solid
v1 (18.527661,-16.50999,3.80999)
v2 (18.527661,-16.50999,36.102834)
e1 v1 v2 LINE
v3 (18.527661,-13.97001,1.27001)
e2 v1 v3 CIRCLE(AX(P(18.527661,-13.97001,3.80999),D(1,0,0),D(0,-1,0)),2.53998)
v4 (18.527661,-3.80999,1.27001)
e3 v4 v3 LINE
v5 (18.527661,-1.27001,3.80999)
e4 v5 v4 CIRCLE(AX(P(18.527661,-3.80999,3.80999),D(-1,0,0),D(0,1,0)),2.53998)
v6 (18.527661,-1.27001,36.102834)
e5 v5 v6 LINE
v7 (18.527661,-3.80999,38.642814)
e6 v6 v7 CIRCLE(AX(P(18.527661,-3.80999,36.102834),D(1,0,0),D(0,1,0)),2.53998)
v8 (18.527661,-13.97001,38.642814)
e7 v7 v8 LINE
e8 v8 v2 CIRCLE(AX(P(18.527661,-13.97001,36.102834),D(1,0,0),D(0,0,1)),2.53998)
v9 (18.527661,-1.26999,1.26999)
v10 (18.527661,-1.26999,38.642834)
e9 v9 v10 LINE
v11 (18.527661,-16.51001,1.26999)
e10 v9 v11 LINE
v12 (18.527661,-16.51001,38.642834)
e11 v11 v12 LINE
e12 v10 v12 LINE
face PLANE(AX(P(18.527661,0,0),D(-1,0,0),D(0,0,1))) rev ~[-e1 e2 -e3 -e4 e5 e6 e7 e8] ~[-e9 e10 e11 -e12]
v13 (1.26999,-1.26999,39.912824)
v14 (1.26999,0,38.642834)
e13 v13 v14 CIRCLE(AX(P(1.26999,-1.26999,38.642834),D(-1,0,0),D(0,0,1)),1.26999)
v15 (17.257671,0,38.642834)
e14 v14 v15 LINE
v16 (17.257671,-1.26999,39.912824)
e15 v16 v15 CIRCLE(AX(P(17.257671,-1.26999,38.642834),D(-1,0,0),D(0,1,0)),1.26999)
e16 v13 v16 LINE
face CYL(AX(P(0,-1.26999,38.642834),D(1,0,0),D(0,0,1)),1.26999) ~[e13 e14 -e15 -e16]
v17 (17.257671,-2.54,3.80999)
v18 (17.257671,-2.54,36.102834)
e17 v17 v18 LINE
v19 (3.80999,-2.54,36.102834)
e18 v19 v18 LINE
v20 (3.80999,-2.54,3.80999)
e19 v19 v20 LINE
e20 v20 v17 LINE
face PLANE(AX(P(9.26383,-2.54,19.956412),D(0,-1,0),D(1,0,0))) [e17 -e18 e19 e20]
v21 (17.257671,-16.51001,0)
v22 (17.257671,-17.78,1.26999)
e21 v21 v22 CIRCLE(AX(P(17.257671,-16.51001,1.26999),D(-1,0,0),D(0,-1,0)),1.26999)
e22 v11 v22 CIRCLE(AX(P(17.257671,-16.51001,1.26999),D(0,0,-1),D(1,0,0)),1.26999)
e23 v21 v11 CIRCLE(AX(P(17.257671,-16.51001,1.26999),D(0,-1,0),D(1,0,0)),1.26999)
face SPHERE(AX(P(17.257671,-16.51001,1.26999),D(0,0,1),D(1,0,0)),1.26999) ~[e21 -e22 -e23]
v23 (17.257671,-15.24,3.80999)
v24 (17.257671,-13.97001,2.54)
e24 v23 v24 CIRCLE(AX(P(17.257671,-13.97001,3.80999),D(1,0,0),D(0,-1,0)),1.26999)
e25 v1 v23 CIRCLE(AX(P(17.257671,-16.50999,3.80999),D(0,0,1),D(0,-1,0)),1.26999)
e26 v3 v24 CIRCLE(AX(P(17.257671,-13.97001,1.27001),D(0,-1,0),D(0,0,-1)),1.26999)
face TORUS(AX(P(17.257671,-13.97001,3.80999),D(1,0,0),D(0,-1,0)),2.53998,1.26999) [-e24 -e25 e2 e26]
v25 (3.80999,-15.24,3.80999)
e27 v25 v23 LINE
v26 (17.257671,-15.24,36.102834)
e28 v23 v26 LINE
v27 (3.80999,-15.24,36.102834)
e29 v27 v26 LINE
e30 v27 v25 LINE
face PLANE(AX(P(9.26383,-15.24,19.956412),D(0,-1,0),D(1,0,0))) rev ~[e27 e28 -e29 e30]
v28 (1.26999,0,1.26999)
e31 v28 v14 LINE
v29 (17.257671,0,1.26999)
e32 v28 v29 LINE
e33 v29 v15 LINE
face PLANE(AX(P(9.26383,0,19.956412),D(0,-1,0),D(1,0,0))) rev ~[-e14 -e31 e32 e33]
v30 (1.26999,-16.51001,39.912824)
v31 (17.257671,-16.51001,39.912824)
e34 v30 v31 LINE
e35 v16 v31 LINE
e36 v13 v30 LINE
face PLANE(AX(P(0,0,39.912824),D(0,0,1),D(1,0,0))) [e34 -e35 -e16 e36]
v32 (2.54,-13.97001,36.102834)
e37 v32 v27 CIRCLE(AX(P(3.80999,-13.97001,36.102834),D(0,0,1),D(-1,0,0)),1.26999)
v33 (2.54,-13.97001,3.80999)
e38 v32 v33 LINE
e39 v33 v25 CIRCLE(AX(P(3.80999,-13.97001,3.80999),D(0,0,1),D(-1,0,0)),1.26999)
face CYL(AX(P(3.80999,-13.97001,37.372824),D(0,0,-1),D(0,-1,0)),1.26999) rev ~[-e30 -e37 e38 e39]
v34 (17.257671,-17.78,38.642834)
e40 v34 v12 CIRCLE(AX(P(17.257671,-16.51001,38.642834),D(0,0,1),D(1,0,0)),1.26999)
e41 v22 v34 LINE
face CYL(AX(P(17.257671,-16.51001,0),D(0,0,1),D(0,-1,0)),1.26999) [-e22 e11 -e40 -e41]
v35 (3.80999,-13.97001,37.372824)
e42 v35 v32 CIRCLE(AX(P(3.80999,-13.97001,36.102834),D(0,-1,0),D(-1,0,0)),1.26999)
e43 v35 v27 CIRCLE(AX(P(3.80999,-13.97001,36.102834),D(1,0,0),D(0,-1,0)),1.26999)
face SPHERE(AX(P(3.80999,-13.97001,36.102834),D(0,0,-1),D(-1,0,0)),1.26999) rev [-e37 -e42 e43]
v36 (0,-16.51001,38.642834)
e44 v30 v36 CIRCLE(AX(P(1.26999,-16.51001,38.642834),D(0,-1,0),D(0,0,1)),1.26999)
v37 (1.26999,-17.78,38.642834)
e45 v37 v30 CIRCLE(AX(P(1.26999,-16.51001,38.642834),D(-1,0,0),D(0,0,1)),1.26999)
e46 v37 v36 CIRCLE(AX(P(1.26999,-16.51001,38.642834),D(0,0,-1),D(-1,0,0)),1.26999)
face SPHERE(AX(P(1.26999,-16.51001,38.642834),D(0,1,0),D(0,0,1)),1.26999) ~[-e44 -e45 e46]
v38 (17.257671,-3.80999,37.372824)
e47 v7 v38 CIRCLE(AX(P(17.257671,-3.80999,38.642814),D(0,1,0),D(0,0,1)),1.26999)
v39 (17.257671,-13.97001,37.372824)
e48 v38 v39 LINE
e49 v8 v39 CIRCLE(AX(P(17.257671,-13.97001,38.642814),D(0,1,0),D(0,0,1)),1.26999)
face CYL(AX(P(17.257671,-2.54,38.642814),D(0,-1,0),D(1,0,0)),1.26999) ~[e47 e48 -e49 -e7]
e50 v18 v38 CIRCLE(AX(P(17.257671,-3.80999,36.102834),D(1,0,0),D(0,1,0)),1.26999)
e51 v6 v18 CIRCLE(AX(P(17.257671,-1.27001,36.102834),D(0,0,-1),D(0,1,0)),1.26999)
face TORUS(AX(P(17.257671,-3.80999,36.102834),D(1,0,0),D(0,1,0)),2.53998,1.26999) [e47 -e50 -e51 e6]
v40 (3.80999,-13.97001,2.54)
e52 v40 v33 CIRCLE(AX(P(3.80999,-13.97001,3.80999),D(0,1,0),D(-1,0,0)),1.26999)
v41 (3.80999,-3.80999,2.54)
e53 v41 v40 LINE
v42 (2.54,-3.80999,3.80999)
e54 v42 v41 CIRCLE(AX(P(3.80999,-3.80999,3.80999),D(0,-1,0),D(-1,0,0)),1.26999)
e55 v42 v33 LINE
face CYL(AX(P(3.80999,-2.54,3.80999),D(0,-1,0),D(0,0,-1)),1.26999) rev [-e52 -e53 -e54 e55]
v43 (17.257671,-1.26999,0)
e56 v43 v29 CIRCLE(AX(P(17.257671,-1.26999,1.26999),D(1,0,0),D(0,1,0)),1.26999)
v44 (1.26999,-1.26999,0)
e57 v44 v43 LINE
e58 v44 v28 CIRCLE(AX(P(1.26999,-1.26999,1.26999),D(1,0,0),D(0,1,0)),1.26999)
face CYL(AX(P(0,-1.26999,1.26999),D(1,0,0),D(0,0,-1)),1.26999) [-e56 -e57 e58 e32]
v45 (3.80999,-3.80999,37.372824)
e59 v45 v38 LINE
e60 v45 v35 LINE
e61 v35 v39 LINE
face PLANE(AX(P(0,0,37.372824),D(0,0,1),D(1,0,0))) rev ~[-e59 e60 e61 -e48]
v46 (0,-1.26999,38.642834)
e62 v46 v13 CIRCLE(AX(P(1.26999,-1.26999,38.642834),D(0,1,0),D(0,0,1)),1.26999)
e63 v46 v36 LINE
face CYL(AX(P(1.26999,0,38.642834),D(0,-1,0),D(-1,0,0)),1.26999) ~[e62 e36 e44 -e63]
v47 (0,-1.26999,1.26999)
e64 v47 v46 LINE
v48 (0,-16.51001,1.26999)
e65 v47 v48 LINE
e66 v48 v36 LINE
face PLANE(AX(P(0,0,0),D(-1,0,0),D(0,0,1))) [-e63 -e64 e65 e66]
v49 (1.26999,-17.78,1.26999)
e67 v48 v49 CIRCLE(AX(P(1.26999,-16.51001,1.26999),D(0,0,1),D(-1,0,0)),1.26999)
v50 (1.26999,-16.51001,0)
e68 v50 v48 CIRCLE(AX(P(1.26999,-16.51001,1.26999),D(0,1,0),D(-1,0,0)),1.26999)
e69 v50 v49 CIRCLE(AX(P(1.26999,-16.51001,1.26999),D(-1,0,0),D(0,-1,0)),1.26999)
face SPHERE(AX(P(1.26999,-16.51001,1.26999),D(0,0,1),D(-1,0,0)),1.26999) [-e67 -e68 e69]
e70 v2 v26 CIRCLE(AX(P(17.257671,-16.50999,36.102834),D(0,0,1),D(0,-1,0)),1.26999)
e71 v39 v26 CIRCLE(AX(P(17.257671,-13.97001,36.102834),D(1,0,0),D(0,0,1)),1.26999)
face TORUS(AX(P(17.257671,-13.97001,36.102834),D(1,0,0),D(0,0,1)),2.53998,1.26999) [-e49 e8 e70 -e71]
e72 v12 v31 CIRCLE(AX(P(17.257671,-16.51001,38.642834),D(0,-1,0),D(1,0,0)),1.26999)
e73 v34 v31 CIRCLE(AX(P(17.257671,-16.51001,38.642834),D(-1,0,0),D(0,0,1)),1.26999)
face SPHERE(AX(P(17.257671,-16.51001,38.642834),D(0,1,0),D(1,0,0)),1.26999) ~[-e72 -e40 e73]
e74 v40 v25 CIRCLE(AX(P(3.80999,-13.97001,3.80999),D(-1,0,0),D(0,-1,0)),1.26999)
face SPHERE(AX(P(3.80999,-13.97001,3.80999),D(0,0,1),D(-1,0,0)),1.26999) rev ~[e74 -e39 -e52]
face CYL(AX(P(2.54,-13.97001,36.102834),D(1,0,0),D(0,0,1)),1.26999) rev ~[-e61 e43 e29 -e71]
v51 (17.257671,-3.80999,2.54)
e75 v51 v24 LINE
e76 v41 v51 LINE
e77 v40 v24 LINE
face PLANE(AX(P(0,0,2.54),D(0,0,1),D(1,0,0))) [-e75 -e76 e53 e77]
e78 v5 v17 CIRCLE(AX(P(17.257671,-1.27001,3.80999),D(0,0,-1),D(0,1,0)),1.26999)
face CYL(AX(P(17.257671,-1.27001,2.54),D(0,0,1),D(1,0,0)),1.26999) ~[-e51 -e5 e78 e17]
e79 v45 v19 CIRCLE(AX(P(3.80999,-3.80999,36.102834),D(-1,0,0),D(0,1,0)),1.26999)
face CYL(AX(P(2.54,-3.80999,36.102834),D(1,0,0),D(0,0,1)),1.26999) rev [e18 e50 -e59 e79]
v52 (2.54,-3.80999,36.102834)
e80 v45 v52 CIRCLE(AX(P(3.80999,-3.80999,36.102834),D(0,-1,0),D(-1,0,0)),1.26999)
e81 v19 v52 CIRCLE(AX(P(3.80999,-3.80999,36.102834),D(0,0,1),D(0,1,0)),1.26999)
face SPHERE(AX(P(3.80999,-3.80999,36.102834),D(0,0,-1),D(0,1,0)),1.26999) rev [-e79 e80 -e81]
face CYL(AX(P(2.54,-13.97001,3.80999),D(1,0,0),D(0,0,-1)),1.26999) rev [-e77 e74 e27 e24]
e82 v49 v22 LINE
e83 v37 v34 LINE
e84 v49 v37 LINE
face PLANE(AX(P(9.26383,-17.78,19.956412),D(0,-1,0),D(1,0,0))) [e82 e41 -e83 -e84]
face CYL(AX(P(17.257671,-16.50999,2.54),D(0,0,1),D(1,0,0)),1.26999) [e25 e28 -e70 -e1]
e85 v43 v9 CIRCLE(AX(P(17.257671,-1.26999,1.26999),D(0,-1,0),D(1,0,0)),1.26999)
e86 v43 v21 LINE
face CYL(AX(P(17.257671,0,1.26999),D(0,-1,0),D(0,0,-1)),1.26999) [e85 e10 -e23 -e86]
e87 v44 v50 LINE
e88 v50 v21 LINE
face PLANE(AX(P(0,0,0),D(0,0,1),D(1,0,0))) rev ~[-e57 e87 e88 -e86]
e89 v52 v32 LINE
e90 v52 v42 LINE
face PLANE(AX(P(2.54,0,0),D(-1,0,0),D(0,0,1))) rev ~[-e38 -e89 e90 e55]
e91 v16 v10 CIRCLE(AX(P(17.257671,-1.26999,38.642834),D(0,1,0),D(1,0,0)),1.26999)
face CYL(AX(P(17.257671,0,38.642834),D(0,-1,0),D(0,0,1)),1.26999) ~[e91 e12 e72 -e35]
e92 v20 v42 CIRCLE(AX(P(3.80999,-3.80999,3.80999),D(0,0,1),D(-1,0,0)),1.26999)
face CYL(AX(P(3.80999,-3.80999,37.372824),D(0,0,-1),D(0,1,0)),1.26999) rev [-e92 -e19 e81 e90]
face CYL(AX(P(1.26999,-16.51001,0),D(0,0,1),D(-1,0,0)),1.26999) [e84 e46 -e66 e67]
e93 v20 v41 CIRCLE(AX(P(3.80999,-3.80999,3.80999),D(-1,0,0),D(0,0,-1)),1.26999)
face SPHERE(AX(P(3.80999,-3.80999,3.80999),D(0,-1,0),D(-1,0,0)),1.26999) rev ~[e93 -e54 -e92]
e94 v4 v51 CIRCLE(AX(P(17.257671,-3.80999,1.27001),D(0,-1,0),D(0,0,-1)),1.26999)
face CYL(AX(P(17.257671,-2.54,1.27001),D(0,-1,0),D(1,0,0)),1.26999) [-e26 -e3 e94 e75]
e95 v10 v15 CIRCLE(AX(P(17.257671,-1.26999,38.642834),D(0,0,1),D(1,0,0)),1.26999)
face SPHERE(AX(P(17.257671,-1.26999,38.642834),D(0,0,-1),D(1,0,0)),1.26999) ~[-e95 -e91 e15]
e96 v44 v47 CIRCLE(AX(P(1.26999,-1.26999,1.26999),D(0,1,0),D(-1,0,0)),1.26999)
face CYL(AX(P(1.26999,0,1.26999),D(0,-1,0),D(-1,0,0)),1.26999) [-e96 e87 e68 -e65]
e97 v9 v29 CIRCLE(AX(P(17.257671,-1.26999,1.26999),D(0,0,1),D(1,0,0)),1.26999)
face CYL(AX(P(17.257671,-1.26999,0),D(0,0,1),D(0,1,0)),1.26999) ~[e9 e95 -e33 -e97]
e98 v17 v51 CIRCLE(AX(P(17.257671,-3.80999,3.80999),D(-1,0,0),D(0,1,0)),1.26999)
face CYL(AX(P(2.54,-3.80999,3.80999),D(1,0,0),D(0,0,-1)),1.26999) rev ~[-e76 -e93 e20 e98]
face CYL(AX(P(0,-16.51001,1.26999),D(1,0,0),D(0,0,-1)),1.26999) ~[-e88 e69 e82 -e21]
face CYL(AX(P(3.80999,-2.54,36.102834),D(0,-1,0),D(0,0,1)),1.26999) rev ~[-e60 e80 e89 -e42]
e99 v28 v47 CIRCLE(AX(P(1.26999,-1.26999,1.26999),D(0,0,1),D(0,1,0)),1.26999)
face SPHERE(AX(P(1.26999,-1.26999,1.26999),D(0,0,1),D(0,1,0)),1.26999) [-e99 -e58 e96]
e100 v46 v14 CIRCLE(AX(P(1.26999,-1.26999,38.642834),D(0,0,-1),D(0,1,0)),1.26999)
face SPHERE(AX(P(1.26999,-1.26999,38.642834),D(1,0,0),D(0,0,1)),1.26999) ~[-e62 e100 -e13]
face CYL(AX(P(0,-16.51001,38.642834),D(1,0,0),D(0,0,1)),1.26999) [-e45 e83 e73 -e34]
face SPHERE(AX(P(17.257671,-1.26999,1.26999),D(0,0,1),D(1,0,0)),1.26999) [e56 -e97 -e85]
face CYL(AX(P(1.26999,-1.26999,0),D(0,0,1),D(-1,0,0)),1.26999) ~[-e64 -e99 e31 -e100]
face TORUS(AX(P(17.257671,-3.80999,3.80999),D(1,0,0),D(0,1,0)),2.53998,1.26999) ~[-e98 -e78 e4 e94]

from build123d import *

# Parameters (mm, degrees)
F0_W     = 18.5276605189
F0_H     = 39.9128235877
F1_DEPTH = 17.78
F2_T     = -2.54
F3_R     = 1.26999


# Not quite as in the source:
# - a fillet or chamfer is up to 0.001 mm smaller than in the source, because OpenCascade refuses the exact size


with BuildPart() as f1:
    # F0 (on Front) → F1 (new body)
    with BuildSketch(Plane.XZ):
        with Locations((9.2638302594, 19.9564117938)):
            Rectangle(F0_W, F0_H)
    extrude(amount=F1_DEPTH)

    # F2
    f2_openings = [f1.faces().sort_by_distance(p)[0] for p in [
        (18.527661, -8.89, 19.956412),
    ]]
    offset(amount=F2_T, openings=f2_openings)

    # F3 (radius 1.27 in the source; OpenCascade refuses exactly that, so slightly less here)
    f3_edges = [f1.edges().sort_by_distance(p)[0] for p in [
        (18.527661, 0, 19.956412),
        (18.527661, -2.54, 19.956412),
        (18.527661, -8.89, 37.372824),
        (18.527661, -8.89, 39.912824),
        (18.527661, -15.24, 19.956412),
        (18.527661, -17.78, 19.956412),
        (18.527661, -8.89, 2.54),
        (18.527661, -8.89, 0),
        (9.26383, 0, 39.912824),
        (0, -8.89, 39.912824),
        (9.26383, -17.78, 39.912824),
        (2.54, -15.24, 19.956412),
        (2.54, -8.89, 2.54),
        (0, 0, 19.956412),
        (9.26383, 0, 0),
        (0, -17.78, 19.956412),
        (0, -8.89, 0),
        (9.26383, -17.78, 0),
        (2.54, -2.54, 19.956412),
        (10.53383, -2.54, 37.372824),
        (2.54, -8.89, 37.372824),
        (10.53383, -2.54, 2.54),
        (10.53383, -15.24, 2.54),
        (10.53383, -15.24, 37.372824),
    ]]
    fillet(f3_edges, radius=F3_R)


solid = f1.part
